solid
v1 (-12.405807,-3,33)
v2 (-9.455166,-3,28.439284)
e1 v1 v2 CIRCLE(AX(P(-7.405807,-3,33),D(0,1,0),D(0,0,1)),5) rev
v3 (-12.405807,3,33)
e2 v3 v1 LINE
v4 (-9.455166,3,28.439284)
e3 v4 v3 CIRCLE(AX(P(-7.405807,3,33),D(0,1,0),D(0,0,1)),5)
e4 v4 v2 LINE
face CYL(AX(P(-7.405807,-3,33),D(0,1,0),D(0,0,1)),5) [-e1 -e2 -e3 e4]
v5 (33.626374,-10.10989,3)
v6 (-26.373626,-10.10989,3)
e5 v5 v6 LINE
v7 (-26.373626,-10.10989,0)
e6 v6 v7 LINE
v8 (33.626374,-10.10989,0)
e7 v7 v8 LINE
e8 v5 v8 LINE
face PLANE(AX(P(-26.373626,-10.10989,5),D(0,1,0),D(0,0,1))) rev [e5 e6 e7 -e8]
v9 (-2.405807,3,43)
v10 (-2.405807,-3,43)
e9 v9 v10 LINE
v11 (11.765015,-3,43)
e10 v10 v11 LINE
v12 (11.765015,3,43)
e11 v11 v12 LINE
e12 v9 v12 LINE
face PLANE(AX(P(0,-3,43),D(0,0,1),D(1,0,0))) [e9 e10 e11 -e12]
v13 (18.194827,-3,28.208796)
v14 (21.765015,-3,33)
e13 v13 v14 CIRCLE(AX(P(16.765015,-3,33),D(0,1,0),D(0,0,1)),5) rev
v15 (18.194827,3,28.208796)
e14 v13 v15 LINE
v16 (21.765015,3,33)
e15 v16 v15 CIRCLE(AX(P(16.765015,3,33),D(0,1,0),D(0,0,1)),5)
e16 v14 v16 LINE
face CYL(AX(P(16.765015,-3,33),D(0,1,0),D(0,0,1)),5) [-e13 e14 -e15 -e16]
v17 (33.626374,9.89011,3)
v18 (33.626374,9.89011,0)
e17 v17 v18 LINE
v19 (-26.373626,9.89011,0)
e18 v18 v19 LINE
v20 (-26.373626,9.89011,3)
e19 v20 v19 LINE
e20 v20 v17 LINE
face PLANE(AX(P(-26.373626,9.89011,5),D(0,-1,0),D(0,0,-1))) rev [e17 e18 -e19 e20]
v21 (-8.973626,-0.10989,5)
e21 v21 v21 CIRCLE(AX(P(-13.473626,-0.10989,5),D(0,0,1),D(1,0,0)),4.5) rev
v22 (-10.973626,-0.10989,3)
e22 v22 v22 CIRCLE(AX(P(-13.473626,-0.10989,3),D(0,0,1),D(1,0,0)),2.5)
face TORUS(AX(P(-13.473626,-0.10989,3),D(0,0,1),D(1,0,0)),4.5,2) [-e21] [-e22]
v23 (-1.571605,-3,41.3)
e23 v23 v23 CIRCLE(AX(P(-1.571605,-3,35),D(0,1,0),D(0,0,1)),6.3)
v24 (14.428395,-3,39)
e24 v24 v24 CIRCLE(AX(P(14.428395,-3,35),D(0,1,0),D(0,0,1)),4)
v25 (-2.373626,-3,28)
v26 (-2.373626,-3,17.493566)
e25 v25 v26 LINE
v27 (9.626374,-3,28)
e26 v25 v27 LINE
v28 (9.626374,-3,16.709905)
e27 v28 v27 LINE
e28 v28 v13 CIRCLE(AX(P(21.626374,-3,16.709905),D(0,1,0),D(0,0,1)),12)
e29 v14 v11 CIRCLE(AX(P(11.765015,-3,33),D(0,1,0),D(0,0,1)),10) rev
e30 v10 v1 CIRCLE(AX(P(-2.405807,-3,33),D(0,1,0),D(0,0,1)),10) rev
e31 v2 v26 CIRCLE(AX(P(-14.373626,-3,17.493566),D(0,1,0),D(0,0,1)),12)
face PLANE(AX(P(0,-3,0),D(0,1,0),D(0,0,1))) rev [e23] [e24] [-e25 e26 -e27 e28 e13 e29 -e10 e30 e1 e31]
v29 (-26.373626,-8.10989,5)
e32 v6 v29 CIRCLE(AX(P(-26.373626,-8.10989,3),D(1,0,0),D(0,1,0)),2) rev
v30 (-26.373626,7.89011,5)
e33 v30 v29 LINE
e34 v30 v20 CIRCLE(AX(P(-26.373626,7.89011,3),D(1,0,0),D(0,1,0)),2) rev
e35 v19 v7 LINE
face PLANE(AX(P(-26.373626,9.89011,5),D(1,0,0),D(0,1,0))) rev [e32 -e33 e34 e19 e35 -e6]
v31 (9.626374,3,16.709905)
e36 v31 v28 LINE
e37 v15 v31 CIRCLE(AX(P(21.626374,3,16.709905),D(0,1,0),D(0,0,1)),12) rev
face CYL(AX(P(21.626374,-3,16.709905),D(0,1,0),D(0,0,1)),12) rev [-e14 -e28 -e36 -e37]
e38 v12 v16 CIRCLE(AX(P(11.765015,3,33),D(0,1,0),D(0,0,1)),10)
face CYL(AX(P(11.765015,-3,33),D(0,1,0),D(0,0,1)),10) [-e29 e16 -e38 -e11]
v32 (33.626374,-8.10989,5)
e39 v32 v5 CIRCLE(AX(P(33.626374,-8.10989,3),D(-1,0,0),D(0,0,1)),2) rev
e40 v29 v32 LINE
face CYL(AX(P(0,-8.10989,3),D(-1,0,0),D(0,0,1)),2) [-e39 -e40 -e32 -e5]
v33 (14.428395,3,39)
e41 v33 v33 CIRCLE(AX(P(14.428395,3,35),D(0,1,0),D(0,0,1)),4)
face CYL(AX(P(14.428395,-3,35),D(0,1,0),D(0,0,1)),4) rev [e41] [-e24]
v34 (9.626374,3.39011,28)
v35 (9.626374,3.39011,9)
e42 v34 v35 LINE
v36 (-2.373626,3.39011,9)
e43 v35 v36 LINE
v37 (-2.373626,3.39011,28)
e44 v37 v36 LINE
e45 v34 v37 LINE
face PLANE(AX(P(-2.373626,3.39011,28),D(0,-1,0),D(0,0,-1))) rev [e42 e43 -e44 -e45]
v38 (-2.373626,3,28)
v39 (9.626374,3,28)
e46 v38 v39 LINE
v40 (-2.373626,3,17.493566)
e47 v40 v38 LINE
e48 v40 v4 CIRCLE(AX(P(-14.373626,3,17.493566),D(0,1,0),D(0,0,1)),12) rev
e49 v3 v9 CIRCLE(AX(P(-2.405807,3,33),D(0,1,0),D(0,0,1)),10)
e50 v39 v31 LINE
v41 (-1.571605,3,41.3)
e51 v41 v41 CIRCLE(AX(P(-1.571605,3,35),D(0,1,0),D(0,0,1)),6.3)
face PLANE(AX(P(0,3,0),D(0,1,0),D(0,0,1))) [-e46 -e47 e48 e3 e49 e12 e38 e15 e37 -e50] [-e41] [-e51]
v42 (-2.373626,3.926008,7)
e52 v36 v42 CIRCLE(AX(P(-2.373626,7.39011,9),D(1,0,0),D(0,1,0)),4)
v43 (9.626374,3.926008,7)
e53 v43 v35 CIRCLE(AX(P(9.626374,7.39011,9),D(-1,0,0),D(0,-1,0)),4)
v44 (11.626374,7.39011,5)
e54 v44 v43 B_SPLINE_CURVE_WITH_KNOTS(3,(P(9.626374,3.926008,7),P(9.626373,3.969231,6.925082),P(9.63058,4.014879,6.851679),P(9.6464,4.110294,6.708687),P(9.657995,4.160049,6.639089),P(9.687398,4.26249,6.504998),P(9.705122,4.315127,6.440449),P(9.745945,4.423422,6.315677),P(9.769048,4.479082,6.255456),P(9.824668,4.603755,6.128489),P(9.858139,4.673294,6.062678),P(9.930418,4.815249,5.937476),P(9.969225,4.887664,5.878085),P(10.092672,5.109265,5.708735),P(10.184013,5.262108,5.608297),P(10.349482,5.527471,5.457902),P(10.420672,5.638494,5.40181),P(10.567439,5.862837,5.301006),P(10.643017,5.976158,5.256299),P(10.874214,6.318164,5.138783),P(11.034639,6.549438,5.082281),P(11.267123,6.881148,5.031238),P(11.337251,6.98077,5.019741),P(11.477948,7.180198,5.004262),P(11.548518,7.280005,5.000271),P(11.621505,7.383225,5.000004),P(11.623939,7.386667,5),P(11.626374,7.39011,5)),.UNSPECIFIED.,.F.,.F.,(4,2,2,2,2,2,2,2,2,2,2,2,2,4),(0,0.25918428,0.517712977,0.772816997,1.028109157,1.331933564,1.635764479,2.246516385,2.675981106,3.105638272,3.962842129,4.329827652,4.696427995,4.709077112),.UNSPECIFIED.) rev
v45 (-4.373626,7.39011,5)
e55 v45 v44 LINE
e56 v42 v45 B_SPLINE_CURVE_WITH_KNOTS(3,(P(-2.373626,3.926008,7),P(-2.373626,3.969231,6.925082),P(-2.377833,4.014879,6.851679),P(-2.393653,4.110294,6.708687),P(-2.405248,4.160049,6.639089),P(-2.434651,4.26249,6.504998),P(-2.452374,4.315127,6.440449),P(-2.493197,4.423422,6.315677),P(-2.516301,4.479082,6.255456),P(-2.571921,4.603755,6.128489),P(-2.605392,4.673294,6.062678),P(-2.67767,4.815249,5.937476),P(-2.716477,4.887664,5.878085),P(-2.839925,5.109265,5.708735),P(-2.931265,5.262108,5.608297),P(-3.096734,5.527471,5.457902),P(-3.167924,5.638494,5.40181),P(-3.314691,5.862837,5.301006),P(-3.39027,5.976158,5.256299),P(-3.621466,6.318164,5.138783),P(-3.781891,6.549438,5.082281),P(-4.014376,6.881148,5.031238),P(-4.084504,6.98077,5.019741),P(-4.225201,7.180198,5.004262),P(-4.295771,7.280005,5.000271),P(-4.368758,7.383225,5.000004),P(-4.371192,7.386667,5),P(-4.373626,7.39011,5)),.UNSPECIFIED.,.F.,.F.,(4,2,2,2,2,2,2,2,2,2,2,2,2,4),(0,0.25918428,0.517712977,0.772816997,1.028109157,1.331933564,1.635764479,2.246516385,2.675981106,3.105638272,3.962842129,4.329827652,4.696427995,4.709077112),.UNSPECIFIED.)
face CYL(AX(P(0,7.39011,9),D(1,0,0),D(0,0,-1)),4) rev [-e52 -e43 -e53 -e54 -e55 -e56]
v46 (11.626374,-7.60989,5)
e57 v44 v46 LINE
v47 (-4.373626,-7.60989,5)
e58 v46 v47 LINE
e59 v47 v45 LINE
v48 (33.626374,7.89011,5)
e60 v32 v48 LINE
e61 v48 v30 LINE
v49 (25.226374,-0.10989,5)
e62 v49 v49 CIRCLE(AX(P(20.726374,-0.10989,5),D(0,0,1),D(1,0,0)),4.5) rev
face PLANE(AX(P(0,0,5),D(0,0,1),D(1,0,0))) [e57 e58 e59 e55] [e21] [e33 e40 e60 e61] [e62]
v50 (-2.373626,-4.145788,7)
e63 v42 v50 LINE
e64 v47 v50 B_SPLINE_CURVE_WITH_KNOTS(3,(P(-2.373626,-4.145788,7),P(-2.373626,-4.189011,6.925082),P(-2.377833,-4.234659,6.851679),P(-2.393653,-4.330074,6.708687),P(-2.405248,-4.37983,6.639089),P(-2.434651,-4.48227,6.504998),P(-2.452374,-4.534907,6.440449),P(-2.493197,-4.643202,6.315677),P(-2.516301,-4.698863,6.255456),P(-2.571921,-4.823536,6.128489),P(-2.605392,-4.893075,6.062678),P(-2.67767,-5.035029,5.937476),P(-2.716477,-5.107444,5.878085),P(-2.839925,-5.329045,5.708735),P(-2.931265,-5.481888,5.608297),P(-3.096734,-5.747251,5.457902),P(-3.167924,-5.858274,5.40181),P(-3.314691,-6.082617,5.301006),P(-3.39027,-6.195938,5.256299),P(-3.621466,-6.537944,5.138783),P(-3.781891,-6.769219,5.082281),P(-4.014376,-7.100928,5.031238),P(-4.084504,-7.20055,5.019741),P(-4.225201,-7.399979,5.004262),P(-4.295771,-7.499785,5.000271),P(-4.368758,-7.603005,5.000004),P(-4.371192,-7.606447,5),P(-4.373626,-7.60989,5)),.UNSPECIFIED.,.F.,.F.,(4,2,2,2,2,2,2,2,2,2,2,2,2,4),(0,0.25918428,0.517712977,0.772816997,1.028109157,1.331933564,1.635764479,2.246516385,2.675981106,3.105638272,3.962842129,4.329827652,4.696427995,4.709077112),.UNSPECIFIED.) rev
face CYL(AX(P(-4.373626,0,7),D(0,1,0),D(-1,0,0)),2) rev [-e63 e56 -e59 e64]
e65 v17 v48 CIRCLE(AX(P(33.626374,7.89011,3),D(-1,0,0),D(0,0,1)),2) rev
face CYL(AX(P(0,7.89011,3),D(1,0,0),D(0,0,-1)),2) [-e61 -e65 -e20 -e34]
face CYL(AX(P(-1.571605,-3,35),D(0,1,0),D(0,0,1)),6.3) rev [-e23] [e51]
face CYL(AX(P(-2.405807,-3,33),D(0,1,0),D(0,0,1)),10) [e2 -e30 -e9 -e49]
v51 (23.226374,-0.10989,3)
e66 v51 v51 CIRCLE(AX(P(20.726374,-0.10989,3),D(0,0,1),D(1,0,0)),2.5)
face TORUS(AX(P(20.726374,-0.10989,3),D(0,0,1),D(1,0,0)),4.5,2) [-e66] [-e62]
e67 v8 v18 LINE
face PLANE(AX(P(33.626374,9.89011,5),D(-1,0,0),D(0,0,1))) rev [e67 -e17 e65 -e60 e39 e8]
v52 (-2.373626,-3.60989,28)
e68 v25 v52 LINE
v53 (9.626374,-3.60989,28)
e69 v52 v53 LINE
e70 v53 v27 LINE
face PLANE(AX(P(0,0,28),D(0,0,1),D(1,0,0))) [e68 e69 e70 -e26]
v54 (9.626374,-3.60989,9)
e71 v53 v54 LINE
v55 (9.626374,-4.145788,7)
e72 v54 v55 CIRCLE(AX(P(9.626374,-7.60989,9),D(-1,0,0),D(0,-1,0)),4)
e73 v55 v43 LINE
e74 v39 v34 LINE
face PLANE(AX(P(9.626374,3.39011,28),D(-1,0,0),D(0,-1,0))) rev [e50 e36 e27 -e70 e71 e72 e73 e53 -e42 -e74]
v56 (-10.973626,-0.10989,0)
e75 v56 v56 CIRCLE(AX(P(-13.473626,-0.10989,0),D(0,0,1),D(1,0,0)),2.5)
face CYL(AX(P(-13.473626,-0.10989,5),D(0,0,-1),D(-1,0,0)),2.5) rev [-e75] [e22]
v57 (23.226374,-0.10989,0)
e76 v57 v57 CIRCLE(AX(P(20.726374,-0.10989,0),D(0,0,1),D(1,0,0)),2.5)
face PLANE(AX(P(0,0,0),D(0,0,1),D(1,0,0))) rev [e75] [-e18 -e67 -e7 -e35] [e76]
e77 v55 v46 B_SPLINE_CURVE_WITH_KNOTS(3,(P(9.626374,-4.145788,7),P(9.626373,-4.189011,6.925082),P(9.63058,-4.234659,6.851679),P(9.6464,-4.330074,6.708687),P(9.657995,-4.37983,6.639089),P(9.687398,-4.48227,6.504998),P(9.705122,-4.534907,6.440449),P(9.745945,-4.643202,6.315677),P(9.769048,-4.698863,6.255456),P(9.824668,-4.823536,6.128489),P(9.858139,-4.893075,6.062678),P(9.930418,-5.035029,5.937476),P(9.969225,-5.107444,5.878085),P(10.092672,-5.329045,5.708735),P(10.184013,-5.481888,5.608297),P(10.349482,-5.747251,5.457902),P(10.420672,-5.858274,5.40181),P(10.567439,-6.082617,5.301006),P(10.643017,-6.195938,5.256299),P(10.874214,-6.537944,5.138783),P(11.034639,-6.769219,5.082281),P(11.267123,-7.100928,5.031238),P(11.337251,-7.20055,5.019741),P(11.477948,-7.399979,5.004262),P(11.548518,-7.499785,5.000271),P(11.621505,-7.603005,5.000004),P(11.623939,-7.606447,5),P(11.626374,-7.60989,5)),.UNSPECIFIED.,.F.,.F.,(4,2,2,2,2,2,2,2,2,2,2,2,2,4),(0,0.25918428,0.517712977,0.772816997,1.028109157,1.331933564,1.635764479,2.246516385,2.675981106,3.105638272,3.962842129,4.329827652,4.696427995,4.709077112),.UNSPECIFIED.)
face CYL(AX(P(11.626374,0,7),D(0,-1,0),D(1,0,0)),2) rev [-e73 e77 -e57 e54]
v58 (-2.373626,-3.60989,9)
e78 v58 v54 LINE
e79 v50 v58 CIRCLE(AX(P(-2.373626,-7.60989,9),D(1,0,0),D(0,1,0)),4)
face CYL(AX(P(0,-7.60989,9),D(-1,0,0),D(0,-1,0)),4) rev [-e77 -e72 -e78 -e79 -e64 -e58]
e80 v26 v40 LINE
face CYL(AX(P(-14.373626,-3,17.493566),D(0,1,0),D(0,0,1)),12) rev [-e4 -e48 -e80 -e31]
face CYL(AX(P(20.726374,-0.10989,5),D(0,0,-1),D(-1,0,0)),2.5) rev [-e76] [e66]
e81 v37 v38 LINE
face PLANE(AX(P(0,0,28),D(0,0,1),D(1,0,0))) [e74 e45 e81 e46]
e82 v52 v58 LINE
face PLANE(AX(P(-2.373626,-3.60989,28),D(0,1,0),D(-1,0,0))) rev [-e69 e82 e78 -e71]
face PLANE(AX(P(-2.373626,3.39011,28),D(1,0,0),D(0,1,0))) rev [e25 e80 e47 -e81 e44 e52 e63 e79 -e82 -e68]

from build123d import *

# Parameters (mm, degrees)
ESBO_O1_W                     = 60
ESBO_O1_H                     = 20
ESBO_O1_R                     = 2.5
RESSALTO_EXTRUS_O2_DEPTH      = 5
ESBO_O2_W                     = 12
ESBO_O2_H                     = 7
RESSALTO_EXTRUS_O3_DEPTH      = 28
RESSALTO_EXTRUS_O4_DEPTH      = 3
RESSALTO_EXTRUS_O4_DEPTH_BACK = 3
ESBO_O3_R                     = 4
ESBO_O3_R_2                   = 6.3
FILETE1_R                     = 10
FILETE2_R                     = 10
FILETE5_R                     = 5
FILETE7_R                     = 5
FILETE9_R                     = 2
FILETE10_R                    = 2
FILETE13_R                    = 12
FILETE14_R                    = 12
FILETE15_R                    = 4
FILETE16_R                    = 4
FILETE17_R                    = 2
FILETE18_R                    = 2
FILETE19_R                    = 2
FILETE20_R                    = 2


with BuildPart() as part:
    # Esboço1 → Ressalto-extrusão2 (new body)
    with BuildSketch(Plane.XY):
        with Locations((3.626373626, -0.10989011)):
            Rectangle(ESBO_O1_W, ESBO_O1_H)
        with Locations((-13.473626374, -0.10989011)):
            Circle(ESBO_O1_R, mode=Mode.SUBTRACT)
        with Locations((20.726373626, -0.10989011)):
            Circle(ESBO_O1_R, mode=Mode.SUBTRACT)
    extrude(amount=RESSALTO_EXTRUS_O2_DEPTH)

    # Esboço2 → Ressalto-extrusão3 (add)
    with BuildSketch(Plane.XY):
        with Locations((3.626373626, -0.10989011)):
            Rectangle(ESBO_O2_W, ESBO_O2_H)
    extrude(amount=RESSALTO_EXTRUS_O3_DEPTH)

    # Esboço3 → Ressalto-extrusão4 (add, two sides: drawn at the far end of the back side and taken through both)
    with BuildSketch(Plane(origin=(0, 0, 0), x_dir=(1, 0, 0), z_dir=(0, 1, 0)).offset(-RESSALTO_EXTRUS_O4_DEPTH_BACK)):
        Polygon((-21.373626374, -43), (28.626373626, -43), (20.428395134, -28), (-11.066061454, -28), align=None)
        with Locations(Location((14.428395134, -35, 0), (0, 0, 270))):
            Circle(ESBO_O3_R, mode=Mode.SUBTRACT)
        with Locations(Location((-1.571604866, -35, 0), (0, 0, 270))):
            Circle(ESBO_O3_R_2, mode=Mode.SUBTRACT)
    extrude(amount=RESSALTO_EXTRUS_O4_DEPTH + RESSALTO_EXTRUS_O4_DEPTH_BACK)

    # Filete1
    # the kernel refuses this fillet: 10 mm, written as the material it takes off along each edge
    with BuildSketch(Plane(origin=(-21.373626374, 50.419547395, 43), x_dir=(0.5663446817088761, 0, -0.8241684909653315), z_dir=(0, -1, 0))) as filete1_piece_1:
        with BuildLine():
            CenterArc((18.9840083, 9.96923191), FILETE1_R, 145.504279398, 120)
            Line((10.74232339, 15.632678727), (10.577489692, 15.745947664))
            Line((10.577489692, 15.745947664), (-0.164833698, 0.113268936))
            Line((-0.164833698, 0.113268936), (0, -0.2))
            ThreePointArc((0, -0.2), (9.100080969, -0.2), (18.184485011, -0.199384638))
            Line((18.184485011, -0.199384638), (18.200161938, 0))
        make_face()
    extrude(amount=100.839094789, mode=Mode.SUBTRACT)

    # Filete2
    filete2_edges = [part.edges().sort_by_distance(p)[0] for p in [
        (28.626373626, 0, 43),
    ]]
    fillet(filete2_edges, radius=FILETE2_R)

    # Filete5
    filete5_edges = [part.edges().sort_by_distance(p)[0] for p in [
        (20.428395134, 0, 28),
    ]]
    fillet(filete5_edges, radius=FILETE5_R)

    # Filete7
    filete7_edges = [part.edges().sort_by_distance(p)[0] for p in [
        (-11.066061454, 0, 28),
    ]]
    fillet(filete7_edges, radius=FILETE7_R)

    # Filete9
    filete9_edges = [part.edges().sort_by_distance(p)[0] for p in [
        (9.626373626, -0.10989011, 5),
    ]]
    fillet(filete9_edges, radius=FILETE9_R)

    # Filete10
    filete10_edges = [part.edges().sort_by_distance(p)[0] for p in [
        (-2.373626374, -0.10989011, 5),
    ]]
    fillet(filete10_edges, radius=FILETE10_R)

    # Filete13
    # the kernel refuses this fillet: 12 mm, written as the material it adds along each edge
    with BuildSketch(Plane(origin=(-2.373626374, -3, 28), x_dir=(0, 0, -1), z_dir=(0, 1, 0))) as filete13_piece_1_section:
        with BuildLine():
            CenterArc((10.506434115, 12), FILETE13_R, 204.196775666, 65.803224334)
            Line((-0.439284084, 7.081539559), (-1.533855904, 6.589693515))
            ThreePointArc((-1.533855904, 6.589693515), (-1.2, 5.032181042), (-1.2, 0))
            Line((-1.2, 0), (0, -1.2))
            Line((0, -1.2), (10.506434115, -1.2))
            Line((10.506434115, -1.2), (10.506434115, 0))
        make_face()
    filete13_piece_1 = extrude(amount=6, mode=Mode.PRIVATE)
    filete13_piece_1 = filete13_piece_1 - Plane(origin=(-1.571604866, 0, 35), x_dir=(0, 0, 1), z_dir=(0, -1, 0)) * Cylinder(6.3, 55, mode=Mode.PRIVATE)
    add(filete13_piece_1)

    # Filete14
    # the kernel refuses this fillet: 12 mm, written as the material it adds along each edge
    with BuildSketch(Plane(origin=(9.626373626, 3, 28), x_dir=(0.9997032338035666, 0, 0.02436071268849559), z_dir=(0, -1, 0))) as filete14_piece_1:
        with BuildLine():
            CenterArc((11.721404045, -11.579073047), FILETE14_R, 105.220471519, 73.38362437)
            Line((-0.275034761, -11.286744494), (-1.474678641, -11.257511639))
            Line((-1.474678641, -11.257511639), (-1.199643881, 0.029232855))
            Line((-1.199643881, 0.029232855), (0.029232855, 1.199643881))
            ThreePointArc((0.029232855, 1.199643881), (7.165756053, 1.025741481), (8.255955801, 1.157907305))
            Line((8.255955801, 1.157907305), (8.570996551, 0))
        make_face()
    extrude(amount=6)

    # Filete15
    filete15_edges = [part.edges().sort_by_distance(p)[0] for p in [
        (3.626373626, 3.39010989, 5),
    ]]
    fillet(filete15_edges, radius=FILETE15_R)

    # Filete16
    filete16_edges = [part.edges().sort_by_distance(p)[0] for p in [
        (3.626373626, -3.60989011, 5),
    ]]
    fillet(filete16_edges, radius=FILETE16_R)

    # Filete17
    filete17_edges = [part.edges().sort_by_distance(p)[0] for p in [
        (18.226373626, -0.10989011, 5),
    ]]
    fillet(filete17_edges, radius=FILETE17_R)

    # Filete18
    filete18_edges = [part.edges().sort_by_distance(p)[0] for p in [
        (-15.973626374, -0.10989011, 5),
    ]]
    fillet(filete18_edges, radius=FILETE18_R)

    # Filete19
    filete19_edges = [part.edges().sort_by_distance(p)[0] for p in [
        (3.626373626, 9.89010989, 5),
    ]]
    fillet(filete19_edges, radius=FILETE19_R)

    # Filete20
    filete20_edges = [part.edges().sort_by_distance(p)[0] for p in [
        (3.626373626, -10.10989011, 5),
    ]]
    fillet(filete20_edges, radius=FILETE20_R)


solid = part.part
